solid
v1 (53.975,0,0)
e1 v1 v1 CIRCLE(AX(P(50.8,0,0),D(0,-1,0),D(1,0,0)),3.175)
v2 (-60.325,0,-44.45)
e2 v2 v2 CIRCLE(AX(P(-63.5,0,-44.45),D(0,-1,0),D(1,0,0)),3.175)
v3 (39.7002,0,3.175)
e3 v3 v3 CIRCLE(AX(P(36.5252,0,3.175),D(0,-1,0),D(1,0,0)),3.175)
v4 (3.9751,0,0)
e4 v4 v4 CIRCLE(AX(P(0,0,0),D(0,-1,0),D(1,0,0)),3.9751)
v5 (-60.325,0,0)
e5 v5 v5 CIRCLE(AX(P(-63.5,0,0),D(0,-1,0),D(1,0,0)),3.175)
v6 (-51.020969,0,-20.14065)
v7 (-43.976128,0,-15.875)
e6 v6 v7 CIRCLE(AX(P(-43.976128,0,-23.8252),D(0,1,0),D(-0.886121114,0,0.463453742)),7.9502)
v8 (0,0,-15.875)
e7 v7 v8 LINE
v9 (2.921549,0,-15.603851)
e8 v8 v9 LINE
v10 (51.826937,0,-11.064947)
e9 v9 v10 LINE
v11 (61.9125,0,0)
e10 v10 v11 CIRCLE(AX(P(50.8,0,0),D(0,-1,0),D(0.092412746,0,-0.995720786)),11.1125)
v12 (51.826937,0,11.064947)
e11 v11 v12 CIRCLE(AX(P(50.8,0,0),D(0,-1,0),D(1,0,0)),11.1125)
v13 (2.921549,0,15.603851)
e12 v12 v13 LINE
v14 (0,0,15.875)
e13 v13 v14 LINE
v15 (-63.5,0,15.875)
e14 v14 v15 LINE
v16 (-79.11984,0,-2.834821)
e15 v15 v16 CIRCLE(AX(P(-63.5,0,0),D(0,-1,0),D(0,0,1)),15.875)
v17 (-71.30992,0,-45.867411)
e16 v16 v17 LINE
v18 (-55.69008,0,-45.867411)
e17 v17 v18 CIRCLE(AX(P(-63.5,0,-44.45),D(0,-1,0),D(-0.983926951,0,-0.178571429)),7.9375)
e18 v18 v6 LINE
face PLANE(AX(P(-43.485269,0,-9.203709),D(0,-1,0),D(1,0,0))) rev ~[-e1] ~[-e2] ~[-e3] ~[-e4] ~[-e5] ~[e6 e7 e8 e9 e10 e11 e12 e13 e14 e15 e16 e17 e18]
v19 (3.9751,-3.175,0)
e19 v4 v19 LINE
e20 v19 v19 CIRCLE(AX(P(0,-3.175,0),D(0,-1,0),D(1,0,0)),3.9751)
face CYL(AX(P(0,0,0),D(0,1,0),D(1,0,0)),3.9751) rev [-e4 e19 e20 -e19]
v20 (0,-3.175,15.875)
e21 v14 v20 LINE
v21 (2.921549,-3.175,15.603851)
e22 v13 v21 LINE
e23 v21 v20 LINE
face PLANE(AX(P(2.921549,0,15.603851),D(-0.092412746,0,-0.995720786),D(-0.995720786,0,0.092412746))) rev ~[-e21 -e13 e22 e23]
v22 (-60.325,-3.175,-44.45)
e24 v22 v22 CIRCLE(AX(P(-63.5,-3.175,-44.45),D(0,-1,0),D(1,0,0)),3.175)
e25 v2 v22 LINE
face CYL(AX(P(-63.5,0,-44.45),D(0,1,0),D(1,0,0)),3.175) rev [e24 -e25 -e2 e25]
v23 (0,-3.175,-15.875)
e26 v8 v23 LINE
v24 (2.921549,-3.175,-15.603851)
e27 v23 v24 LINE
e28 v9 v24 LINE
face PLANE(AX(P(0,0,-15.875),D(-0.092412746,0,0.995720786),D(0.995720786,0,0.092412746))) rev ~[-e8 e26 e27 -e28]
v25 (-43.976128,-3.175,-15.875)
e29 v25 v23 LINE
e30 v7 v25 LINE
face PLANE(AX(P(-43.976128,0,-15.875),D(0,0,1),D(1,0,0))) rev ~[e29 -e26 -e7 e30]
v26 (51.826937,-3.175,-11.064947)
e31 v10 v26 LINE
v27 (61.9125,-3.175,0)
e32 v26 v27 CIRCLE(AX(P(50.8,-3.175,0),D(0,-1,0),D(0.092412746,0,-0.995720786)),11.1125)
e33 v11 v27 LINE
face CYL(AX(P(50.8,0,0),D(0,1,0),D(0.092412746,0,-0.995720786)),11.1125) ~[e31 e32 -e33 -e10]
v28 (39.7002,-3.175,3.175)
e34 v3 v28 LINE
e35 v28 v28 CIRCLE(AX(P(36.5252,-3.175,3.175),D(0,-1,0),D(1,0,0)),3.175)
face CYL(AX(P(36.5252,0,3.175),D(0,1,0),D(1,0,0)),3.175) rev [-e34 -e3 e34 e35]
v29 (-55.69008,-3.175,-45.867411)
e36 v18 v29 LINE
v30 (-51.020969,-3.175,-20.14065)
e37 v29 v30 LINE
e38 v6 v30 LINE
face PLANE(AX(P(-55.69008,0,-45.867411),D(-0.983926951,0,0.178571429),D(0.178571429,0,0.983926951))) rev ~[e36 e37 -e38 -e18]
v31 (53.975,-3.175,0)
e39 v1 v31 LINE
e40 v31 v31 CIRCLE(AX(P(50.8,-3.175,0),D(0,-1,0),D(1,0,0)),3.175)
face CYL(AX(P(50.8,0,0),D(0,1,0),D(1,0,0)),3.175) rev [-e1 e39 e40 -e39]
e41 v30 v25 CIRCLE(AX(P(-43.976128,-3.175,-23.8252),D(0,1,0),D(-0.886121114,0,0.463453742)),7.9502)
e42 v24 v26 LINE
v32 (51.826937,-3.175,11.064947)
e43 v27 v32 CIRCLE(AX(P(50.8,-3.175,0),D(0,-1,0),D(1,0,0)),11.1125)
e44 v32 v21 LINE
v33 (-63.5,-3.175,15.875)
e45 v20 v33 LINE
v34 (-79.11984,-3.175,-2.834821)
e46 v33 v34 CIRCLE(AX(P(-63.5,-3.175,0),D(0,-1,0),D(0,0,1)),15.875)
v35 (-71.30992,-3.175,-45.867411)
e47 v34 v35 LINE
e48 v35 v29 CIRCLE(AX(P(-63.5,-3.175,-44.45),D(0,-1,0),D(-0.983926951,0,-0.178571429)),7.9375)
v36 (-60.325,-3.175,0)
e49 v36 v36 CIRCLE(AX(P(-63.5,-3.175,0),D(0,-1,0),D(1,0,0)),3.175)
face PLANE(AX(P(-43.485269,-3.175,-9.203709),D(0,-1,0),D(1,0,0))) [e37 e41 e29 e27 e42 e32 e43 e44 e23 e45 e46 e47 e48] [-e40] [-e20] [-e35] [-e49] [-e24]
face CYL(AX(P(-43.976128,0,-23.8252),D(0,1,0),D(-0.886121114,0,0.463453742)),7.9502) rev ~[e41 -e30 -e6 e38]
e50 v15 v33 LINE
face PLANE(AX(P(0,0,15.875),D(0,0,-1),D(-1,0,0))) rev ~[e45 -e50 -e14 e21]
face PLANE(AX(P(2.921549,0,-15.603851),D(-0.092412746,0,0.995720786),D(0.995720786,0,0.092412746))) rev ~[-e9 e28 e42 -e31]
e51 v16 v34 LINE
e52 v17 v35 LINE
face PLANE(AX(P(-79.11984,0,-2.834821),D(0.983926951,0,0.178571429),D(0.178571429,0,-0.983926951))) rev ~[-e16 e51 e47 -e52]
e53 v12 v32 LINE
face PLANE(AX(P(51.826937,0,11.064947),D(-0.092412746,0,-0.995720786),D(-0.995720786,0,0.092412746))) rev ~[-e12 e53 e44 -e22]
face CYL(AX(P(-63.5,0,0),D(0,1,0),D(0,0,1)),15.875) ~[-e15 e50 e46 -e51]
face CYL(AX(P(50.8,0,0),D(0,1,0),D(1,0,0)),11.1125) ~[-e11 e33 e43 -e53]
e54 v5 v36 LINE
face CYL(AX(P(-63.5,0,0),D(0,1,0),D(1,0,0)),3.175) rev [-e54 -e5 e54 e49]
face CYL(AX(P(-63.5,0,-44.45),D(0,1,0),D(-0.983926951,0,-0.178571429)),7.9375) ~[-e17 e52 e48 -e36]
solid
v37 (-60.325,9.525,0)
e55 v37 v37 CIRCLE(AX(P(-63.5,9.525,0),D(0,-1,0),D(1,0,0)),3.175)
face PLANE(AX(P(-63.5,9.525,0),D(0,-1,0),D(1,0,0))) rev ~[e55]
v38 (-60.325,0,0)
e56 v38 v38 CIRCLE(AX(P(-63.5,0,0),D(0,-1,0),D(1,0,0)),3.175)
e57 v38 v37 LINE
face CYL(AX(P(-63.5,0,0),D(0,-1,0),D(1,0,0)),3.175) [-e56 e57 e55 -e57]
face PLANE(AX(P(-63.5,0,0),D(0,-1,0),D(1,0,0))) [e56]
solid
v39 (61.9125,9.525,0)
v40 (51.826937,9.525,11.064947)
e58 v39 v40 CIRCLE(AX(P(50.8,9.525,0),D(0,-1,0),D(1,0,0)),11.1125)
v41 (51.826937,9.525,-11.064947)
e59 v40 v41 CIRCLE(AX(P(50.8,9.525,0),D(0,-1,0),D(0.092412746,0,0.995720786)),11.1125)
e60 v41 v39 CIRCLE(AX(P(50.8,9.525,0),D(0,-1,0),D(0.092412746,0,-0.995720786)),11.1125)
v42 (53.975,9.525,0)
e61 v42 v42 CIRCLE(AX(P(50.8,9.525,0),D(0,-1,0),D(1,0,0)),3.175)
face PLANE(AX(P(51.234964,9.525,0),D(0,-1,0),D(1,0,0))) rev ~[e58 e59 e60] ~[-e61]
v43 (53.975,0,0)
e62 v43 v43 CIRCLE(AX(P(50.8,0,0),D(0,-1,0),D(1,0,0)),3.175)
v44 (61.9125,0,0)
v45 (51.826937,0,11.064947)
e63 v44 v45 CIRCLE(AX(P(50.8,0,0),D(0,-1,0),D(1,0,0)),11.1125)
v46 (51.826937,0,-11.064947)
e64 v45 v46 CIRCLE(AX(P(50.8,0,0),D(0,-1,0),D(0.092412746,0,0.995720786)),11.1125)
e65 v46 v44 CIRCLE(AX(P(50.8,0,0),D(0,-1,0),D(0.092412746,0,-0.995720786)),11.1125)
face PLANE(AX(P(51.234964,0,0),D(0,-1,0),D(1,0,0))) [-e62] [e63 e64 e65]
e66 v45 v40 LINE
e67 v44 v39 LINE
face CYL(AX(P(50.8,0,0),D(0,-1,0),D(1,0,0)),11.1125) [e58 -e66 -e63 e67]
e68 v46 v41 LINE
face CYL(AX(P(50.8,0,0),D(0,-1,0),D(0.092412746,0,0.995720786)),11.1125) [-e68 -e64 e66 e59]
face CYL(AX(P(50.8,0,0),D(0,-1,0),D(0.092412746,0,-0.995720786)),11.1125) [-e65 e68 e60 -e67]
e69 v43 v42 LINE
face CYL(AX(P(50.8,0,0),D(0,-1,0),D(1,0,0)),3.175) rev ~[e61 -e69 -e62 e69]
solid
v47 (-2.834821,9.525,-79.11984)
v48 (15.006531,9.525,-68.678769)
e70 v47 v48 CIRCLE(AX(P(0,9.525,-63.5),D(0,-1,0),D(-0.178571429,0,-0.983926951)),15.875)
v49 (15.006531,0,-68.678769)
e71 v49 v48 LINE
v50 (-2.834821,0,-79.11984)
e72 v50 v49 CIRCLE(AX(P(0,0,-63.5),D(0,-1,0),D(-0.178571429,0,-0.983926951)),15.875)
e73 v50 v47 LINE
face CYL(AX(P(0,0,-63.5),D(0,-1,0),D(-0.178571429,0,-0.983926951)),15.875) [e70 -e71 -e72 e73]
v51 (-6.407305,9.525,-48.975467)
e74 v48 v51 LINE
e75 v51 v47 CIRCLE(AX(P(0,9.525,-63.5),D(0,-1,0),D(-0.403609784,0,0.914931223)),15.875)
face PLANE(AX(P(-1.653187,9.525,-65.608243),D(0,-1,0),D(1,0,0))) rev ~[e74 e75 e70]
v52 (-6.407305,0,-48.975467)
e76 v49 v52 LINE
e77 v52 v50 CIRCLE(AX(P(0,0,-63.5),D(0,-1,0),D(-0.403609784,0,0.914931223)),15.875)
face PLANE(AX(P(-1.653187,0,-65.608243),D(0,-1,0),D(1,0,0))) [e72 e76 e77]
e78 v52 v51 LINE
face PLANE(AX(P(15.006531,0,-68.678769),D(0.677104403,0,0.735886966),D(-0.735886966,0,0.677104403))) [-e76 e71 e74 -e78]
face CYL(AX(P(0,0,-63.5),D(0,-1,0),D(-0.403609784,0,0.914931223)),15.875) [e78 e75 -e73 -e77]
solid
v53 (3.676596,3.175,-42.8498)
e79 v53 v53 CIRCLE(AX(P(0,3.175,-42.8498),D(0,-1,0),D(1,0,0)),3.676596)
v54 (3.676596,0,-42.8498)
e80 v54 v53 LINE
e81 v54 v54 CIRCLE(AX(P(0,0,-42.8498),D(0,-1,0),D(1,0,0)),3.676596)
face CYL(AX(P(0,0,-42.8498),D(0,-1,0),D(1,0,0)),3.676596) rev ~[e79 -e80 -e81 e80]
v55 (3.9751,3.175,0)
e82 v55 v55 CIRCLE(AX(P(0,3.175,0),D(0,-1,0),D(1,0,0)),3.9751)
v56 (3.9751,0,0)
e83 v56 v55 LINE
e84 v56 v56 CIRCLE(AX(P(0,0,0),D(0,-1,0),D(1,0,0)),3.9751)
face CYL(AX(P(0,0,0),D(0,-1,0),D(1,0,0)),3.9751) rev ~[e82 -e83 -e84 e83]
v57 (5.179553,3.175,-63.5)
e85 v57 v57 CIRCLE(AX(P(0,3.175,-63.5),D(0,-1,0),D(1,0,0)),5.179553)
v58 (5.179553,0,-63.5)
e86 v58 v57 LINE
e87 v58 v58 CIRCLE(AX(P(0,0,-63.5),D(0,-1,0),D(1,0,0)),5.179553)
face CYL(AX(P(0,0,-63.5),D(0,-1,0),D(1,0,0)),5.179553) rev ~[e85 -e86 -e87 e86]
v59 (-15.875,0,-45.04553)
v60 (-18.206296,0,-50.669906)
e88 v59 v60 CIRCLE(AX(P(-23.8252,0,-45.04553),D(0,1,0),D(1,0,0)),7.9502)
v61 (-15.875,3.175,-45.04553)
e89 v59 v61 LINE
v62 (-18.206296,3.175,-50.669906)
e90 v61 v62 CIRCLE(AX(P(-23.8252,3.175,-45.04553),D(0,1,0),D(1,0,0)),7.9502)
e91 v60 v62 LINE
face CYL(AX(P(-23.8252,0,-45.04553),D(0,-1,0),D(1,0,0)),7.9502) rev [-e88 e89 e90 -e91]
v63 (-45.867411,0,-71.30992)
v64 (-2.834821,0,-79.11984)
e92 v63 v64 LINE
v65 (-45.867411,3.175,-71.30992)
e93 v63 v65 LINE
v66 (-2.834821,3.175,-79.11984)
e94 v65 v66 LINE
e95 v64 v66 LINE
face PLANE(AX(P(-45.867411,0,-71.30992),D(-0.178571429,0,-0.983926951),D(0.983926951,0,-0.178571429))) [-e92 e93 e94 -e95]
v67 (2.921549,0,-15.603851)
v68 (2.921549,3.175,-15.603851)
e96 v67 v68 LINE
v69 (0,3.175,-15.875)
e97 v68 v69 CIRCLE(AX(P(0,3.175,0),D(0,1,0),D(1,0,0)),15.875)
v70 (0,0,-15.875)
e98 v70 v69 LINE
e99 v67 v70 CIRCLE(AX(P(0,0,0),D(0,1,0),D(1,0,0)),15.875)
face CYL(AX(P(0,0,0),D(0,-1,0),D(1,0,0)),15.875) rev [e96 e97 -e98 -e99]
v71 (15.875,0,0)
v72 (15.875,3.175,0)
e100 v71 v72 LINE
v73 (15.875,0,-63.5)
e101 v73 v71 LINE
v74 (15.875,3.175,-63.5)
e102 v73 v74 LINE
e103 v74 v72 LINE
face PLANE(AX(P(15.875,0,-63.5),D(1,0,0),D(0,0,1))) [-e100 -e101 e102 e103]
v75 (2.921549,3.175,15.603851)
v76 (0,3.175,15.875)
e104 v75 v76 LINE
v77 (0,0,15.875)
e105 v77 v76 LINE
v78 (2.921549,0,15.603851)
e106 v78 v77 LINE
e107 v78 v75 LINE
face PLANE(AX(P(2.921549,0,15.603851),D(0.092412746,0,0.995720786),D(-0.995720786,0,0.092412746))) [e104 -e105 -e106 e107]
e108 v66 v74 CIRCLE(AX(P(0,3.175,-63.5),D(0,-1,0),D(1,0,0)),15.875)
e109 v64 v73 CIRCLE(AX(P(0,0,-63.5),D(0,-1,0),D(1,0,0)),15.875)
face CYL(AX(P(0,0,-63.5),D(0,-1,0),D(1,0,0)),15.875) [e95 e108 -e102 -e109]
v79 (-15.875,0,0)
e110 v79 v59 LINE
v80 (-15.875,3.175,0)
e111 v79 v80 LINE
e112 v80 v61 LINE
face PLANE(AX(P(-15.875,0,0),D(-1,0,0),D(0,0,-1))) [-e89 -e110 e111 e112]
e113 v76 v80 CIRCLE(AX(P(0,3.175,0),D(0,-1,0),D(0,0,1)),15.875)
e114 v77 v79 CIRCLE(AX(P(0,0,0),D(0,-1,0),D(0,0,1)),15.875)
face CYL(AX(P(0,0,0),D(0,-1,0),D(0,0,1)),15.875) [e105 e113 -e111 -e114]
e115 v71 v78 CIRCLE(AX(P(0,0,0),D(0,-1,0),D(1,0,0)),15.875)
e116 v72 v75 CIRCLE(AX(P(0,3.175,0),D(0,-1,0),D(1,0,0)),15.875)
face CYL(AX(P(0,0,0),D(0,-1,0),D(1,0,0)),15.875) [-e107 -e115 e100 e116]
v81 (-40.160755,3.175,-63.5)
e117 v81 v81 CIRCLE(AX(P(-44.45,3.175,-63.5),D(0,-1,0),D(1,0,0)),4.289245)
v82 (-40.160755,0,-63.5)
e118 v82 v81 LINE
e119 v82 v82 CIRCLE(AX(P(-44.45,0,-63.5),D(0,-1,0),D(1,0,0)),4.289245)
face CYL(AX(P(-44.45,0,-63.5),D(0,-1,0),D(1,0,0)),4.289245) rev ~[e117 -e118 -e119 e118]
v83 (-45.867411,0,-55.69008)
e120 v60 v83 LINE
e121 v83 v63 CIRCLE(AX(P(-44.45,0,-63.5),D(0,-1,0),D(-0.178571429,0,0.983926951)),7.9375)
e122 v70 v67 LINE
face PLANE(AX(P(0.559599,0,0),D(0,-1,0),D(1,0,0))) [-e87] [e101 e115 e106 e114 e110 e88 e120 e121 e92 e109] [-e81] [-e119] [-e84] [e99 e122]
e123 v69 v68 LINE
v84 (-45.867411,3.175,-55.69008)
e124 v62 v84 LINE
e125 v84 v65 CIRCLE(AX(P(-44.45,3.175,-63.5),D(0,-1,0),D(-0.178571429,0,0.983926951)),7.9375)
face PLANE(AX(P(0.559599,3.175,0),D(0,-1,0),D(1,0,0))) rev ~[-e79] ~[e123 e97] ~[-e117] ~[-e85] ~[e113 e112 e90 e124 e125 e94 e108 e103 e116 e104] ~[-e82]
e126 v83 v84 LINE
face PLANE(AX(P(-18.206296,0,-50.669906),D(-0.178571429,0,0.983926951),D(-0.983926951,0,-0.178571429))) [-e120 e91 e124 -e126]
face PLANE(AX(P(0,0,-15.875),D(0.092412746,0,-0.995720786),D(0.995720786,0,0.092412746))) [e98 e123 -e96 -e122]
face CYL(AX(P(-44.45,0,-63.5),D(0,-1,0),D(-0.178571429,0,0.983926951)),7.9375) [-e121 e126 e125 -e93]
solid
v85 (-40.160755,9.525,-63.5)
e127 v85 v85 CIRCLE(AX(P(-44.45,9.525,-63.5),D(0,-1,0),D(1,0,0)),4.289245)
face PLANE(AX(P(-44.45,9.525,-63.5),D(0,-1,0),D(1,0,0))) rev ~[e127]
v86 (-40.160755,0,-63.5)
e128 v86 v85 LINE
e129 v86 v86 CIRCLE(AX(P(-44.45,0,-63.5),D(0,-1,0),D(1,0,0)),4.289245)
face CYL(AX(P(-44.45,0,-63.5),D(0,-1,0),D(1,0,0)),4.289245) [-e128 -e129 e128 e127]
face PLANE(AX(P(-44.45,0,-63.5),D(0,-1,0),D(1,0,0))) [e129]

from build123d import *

# Parameters (mm, degrees)
F0_R     = 3.175
F0_R_2   = 3.9751
F2_DEPTH = 3.175
F1_R     = 4.2892452459
F1_R_2   = 3.6765959768
F1_R_3   = 5.1795527056
F3_DEPTH = 3.175
F6_DEPTH = 9.525


with BuildPart() as f2:
    # F0 (on Front) → F2 (new body)
    with BuildSketch(Plane.XZ):
        with BuildLine():
            ThreePointArc((-63.5, 15.875), (-52.2746798487, 11.2253201513), (-47.625, 0))
            ThreePointArc((-47.625, 0), (-62.076859197, -15.8110814069), (-79.1198403471, -2.8348214286))
            Line((-79.1198403471, -2.8348214286), (-71.3099201735, -45.8674107143))
            ThreePointArc((-71.3099201735, -45.8674107143), (-64.2115704015, -36.5444592966), (-55.5625, -44.45))
            ThreePointArc((-55.5625, -44.45), (-55.5944592966, -45.1615704015), (-55.6900798265, -45.8674107143))
            Line((-55.6900798265, -45.8674107143), (-51.0209685693, -20.140650057))
            ThreePointArc((-51.0209685693, -20.140650057), (-48.093941688, -17.0245166153), (-43.976128489, -15.875))
            Line((-43.976128489, -15.875), (0, -15.875))
            ThreePointArc((0, -15.875), (-15.875, 0), (0, 15.875))
            Line((0, 15.875), (-63.5, 15.875))
        make_face()
        with BuildLine():
            Line((51.8269366371, 11.0649472386), (2.9215490166, 15.6038513305))
            ThreePointArc((2.9215490166, 15.6038513305), (12.2146472655, 10.1399219514), (15.875, 0))
            ThreePointArc((15.875, 0), (12.2146472655, -10.1399219514), (2.9215490166, -15.6038513305))
            Line((2.9215490166, -15.6038513305), (51.8269366371, -11.0649472386))
            ThreePointArc((51.8269366371, -11.0649472386), (39.6875, 0), (51.8269366371, 11.0649472386))
        make_face()
        with Locations((36.5252, 3.175)):
            Circle(F0_R, mode=Mode.SUBTRACT)
        with BuildLine():
            Line((2.9215490166, 15.6038513305), (0, 15.875))
            ThreePointArc((0, 15.875), (-15.875, 0), (0, -15.875))
            Line((0, -15.875), (2.9215490166, -15.6038513305))
            ThreePointArc((2.9215490166, -15.6038513305), (12.2146472655, -10.1399219514), (15.875, 0))
            ThreePointArc((15.875, 0), (12.2146472655, 10.1399219514), (2.9215490166, 15.6038513305))
        make_face()
        Circle(F0_R_2, mode=Mode.SUBTRACT)
        with BuildLine():
            ThreePointArc((61.9125, 0), (59.0127793599, 7.4858474093), (51.8269366371, 11.0649472386))
            ThreePointArc((51.8269366371, 11.0649472386), (39.6875, 0), (51.8269366371, -11.0649472386))
            ThreePointArc((51.8269366371, -11.0649472386), (59.0127793599, -7.4858474093), (61.9125, 0))
        make_face()
        with Locations((50.8, 0)):
            Circle(F0_R, mode=Mode.SUBTRACT)
        with BuildLine():
            ThreePointArc((-79.1198403471, -2.8348214286), (-62.076859197, -15.8110814069), (-47.625, 0))
            ThreePointArc((-47.625, 0), (-52.2746798487, 11.2253201513), (-63.5, 15.875))
            ThreePointArc((-63.5, 15.875), (-75.6864353931, 10.1738103683), (-79.1198403471, -2.8348214286))
        make_face()
        with Locations((-63.5, 0)):
            Circle(F0_R, mode=Mode.SUBTRACT)
        with BuildLine():
            ThreePointArc((-55.5625, -44.45), (-64.2115704015, -36.5444592966), (-71.3099201735, -45.8674107143))
            ThreePointArc((-71.3099201735, -45.8674107143), (-63.5, -52.3875), (-55.6900798265, -45.8674107143))
            ThreePointArc((-55.6900798265, -45.8674107143), (-55.5944592966, -45.1615704015), (-55.5625, -44.45))
        make_face()
        with Locations((-63.5, -44.45)):
            Circle(F0_R, mode=Mode.SUBTRACT)
    extrude(amount=F2_DEPTH)


with BuildPart() as f3:
    # F1 (on Front) → F3 (new body)
    with BuildSketch(Plane.XZ):
        with BuildLine():
            ThreePointArc((-45.8674107143, -55.6900798265), (-52.3875, -63.5), (-45.8674107143, -71.3099201735))
            ThreePointArc((-45.8674107143, -71.3099201735), (-39.3630948158, -69.5932176965), (-36.5125, -63.5))
            ThreePointArc((-36.5125, -63.5), (-39.3630948158, -57.4067823035), (-45.8674107143, -55.6900798265))
        make_face()
        with Locations((-44.45, -63.5)):
            Circle(F1_R, mode=Mode.SUBTRACT)
        with BuildLine():
            ThreePointArc((-2.8348214286, -79.1198403471), (-10.1738103683, -51.3135646069), (15.875, -63.5))
            Line((15.875, -63.5), (15.875, 0))
            ThreePointArc((15.875, 0), (0, -15.875), (-15.875, 0))
            Line((-15.875, 0), (-15.875, -45.0455299837))
            ThreePointArc((-15.875, -45.0455299837), (-16.4809135011, -48.0897270637), (-18.2062962849, -50.6699056006))
            Line((-18.2062962849, -50.6699056006), (-45.8674107143, -55.6900798265))
            ThreePointArc((-45.8674107143, -55.6900798265), (-39.3630948158, -57.4067823035), (-36.5125, -63.5))
            ThreePointArc((-36.5125, -63.5), (-39.3630948158, -69.5932176965), (-45.8674107143, -71.3099201735))
            Line((-45.8674107143, -71.3099201735), (-2.8348214286, -79.1198403471))
        make_face()
        with Locations((0, -42.8498)):
            Circle(F1_R_2, mode=Mode.SUBTRACT)
        with BuildLine():
            ThreePointArc((-2.8348214286, -79.1198403471), (10.1738103683, -75.6864353931), (15.875, -63.5))
            ThreePointArc((15.875, -63.5), (-10.1738103683, -51.3135646069), (-2.8348214286, -79.1198403471))
        make_face()
        with Locations((0, -63.5)):
            Circle(F1_R_3, mode=Mode.SUBTRACT)
    extrude(amount=-F3_DEPTH)

    # F0 (on Front) → F3, piece 2 (join)
    with BuildSketch(Plane.XZ):
        with BuildLine():
            Line((2.9215490166, 15.6038513305), (0, 15.875))
            ThreePointArc((0, 15.875), (-15.875, 0), (0, -15.875))
            Line((0, -15.875), (2.9215490166, -15.6038513305))
            ThreePointArc((2.9215490166, -15.6038513305), (12.2146472655, -10.1399219514), (15.875, 0))
            ThreePointArc((15.875, 0), (12.2146472655, 10.1399219514), (2.9215490166, 15.6038513305))
        make_face()
        Circle(F0_R_2, mode=Mode.SUBTRACT)
    extrude(amount=-F3_DEPTH)


with BuildPart() as f6:
    # F4 (on face) → F6 (new body, through all)
    with BuildSketch(Plane.XZ):
        with BuildLine():
            Line((15.0065312392, -68.678768692), (-6.4073053166, -48.9754668378))
            ThreePointArc((-6.4073053166, -48.9754668378), (-15.7646769793, -65.3683106647), (-2.8348214286, -79.1198403471))
            ThreePointArc((-2.8348214286, -79.1198403471), (8.0182058002, -77.2012408469), (15.0065312392, -68.678768692))
        make_face()
    extrude(amount=-F6_DEPTH)


with BuildPart() as f6b:
    # F1 (on Front) → F6, piece 2 (new body, through all)
    with BuildSketch(Plane.XZ):
        with Locations((-44.45, -63.5)):
            Circle(F1_R)
    extrude(amount=-F6_DEPTH)


with BuildPart() as f6c:
    # F0 (on Front) → F6, piece 3 (new body, through all)
    with BuildSketch(Plane.XZ):
        with Locations((-63.5, 0)):
            Circle(F0_R)
    extrude(amount=-F6_DEPTH)


with BuildPart() as f6d:
    # F0 (on Front) → F6, piece 4 (new body, through all)
    with BuildSketch(Plane.XZ):
        with BuildLine():
            ThreePointArc((61.9125, 0), (59.0127793599, 7.4858474093), (51.8269366371, 11.0649472386))
            ThreePointArc((51.8269366371, 11.0649472386), (39.6875, 0), (51.8269366371, -11.0649472386))
            ThreePointArc((51.8269366371, -11.0649472386), (59.0127793599, -7.4858474093), (61.9125, 0))
        make_face()
        with Locations((50.8, 0)):
            Circle(F0_R, mode=Mode.SUBTRACT)
    extrude(amount=-F6_DEPTH)


solid = Compound([f2.part, f3.part, f6.part, f6b.part, f6c.part, f6d.part])
